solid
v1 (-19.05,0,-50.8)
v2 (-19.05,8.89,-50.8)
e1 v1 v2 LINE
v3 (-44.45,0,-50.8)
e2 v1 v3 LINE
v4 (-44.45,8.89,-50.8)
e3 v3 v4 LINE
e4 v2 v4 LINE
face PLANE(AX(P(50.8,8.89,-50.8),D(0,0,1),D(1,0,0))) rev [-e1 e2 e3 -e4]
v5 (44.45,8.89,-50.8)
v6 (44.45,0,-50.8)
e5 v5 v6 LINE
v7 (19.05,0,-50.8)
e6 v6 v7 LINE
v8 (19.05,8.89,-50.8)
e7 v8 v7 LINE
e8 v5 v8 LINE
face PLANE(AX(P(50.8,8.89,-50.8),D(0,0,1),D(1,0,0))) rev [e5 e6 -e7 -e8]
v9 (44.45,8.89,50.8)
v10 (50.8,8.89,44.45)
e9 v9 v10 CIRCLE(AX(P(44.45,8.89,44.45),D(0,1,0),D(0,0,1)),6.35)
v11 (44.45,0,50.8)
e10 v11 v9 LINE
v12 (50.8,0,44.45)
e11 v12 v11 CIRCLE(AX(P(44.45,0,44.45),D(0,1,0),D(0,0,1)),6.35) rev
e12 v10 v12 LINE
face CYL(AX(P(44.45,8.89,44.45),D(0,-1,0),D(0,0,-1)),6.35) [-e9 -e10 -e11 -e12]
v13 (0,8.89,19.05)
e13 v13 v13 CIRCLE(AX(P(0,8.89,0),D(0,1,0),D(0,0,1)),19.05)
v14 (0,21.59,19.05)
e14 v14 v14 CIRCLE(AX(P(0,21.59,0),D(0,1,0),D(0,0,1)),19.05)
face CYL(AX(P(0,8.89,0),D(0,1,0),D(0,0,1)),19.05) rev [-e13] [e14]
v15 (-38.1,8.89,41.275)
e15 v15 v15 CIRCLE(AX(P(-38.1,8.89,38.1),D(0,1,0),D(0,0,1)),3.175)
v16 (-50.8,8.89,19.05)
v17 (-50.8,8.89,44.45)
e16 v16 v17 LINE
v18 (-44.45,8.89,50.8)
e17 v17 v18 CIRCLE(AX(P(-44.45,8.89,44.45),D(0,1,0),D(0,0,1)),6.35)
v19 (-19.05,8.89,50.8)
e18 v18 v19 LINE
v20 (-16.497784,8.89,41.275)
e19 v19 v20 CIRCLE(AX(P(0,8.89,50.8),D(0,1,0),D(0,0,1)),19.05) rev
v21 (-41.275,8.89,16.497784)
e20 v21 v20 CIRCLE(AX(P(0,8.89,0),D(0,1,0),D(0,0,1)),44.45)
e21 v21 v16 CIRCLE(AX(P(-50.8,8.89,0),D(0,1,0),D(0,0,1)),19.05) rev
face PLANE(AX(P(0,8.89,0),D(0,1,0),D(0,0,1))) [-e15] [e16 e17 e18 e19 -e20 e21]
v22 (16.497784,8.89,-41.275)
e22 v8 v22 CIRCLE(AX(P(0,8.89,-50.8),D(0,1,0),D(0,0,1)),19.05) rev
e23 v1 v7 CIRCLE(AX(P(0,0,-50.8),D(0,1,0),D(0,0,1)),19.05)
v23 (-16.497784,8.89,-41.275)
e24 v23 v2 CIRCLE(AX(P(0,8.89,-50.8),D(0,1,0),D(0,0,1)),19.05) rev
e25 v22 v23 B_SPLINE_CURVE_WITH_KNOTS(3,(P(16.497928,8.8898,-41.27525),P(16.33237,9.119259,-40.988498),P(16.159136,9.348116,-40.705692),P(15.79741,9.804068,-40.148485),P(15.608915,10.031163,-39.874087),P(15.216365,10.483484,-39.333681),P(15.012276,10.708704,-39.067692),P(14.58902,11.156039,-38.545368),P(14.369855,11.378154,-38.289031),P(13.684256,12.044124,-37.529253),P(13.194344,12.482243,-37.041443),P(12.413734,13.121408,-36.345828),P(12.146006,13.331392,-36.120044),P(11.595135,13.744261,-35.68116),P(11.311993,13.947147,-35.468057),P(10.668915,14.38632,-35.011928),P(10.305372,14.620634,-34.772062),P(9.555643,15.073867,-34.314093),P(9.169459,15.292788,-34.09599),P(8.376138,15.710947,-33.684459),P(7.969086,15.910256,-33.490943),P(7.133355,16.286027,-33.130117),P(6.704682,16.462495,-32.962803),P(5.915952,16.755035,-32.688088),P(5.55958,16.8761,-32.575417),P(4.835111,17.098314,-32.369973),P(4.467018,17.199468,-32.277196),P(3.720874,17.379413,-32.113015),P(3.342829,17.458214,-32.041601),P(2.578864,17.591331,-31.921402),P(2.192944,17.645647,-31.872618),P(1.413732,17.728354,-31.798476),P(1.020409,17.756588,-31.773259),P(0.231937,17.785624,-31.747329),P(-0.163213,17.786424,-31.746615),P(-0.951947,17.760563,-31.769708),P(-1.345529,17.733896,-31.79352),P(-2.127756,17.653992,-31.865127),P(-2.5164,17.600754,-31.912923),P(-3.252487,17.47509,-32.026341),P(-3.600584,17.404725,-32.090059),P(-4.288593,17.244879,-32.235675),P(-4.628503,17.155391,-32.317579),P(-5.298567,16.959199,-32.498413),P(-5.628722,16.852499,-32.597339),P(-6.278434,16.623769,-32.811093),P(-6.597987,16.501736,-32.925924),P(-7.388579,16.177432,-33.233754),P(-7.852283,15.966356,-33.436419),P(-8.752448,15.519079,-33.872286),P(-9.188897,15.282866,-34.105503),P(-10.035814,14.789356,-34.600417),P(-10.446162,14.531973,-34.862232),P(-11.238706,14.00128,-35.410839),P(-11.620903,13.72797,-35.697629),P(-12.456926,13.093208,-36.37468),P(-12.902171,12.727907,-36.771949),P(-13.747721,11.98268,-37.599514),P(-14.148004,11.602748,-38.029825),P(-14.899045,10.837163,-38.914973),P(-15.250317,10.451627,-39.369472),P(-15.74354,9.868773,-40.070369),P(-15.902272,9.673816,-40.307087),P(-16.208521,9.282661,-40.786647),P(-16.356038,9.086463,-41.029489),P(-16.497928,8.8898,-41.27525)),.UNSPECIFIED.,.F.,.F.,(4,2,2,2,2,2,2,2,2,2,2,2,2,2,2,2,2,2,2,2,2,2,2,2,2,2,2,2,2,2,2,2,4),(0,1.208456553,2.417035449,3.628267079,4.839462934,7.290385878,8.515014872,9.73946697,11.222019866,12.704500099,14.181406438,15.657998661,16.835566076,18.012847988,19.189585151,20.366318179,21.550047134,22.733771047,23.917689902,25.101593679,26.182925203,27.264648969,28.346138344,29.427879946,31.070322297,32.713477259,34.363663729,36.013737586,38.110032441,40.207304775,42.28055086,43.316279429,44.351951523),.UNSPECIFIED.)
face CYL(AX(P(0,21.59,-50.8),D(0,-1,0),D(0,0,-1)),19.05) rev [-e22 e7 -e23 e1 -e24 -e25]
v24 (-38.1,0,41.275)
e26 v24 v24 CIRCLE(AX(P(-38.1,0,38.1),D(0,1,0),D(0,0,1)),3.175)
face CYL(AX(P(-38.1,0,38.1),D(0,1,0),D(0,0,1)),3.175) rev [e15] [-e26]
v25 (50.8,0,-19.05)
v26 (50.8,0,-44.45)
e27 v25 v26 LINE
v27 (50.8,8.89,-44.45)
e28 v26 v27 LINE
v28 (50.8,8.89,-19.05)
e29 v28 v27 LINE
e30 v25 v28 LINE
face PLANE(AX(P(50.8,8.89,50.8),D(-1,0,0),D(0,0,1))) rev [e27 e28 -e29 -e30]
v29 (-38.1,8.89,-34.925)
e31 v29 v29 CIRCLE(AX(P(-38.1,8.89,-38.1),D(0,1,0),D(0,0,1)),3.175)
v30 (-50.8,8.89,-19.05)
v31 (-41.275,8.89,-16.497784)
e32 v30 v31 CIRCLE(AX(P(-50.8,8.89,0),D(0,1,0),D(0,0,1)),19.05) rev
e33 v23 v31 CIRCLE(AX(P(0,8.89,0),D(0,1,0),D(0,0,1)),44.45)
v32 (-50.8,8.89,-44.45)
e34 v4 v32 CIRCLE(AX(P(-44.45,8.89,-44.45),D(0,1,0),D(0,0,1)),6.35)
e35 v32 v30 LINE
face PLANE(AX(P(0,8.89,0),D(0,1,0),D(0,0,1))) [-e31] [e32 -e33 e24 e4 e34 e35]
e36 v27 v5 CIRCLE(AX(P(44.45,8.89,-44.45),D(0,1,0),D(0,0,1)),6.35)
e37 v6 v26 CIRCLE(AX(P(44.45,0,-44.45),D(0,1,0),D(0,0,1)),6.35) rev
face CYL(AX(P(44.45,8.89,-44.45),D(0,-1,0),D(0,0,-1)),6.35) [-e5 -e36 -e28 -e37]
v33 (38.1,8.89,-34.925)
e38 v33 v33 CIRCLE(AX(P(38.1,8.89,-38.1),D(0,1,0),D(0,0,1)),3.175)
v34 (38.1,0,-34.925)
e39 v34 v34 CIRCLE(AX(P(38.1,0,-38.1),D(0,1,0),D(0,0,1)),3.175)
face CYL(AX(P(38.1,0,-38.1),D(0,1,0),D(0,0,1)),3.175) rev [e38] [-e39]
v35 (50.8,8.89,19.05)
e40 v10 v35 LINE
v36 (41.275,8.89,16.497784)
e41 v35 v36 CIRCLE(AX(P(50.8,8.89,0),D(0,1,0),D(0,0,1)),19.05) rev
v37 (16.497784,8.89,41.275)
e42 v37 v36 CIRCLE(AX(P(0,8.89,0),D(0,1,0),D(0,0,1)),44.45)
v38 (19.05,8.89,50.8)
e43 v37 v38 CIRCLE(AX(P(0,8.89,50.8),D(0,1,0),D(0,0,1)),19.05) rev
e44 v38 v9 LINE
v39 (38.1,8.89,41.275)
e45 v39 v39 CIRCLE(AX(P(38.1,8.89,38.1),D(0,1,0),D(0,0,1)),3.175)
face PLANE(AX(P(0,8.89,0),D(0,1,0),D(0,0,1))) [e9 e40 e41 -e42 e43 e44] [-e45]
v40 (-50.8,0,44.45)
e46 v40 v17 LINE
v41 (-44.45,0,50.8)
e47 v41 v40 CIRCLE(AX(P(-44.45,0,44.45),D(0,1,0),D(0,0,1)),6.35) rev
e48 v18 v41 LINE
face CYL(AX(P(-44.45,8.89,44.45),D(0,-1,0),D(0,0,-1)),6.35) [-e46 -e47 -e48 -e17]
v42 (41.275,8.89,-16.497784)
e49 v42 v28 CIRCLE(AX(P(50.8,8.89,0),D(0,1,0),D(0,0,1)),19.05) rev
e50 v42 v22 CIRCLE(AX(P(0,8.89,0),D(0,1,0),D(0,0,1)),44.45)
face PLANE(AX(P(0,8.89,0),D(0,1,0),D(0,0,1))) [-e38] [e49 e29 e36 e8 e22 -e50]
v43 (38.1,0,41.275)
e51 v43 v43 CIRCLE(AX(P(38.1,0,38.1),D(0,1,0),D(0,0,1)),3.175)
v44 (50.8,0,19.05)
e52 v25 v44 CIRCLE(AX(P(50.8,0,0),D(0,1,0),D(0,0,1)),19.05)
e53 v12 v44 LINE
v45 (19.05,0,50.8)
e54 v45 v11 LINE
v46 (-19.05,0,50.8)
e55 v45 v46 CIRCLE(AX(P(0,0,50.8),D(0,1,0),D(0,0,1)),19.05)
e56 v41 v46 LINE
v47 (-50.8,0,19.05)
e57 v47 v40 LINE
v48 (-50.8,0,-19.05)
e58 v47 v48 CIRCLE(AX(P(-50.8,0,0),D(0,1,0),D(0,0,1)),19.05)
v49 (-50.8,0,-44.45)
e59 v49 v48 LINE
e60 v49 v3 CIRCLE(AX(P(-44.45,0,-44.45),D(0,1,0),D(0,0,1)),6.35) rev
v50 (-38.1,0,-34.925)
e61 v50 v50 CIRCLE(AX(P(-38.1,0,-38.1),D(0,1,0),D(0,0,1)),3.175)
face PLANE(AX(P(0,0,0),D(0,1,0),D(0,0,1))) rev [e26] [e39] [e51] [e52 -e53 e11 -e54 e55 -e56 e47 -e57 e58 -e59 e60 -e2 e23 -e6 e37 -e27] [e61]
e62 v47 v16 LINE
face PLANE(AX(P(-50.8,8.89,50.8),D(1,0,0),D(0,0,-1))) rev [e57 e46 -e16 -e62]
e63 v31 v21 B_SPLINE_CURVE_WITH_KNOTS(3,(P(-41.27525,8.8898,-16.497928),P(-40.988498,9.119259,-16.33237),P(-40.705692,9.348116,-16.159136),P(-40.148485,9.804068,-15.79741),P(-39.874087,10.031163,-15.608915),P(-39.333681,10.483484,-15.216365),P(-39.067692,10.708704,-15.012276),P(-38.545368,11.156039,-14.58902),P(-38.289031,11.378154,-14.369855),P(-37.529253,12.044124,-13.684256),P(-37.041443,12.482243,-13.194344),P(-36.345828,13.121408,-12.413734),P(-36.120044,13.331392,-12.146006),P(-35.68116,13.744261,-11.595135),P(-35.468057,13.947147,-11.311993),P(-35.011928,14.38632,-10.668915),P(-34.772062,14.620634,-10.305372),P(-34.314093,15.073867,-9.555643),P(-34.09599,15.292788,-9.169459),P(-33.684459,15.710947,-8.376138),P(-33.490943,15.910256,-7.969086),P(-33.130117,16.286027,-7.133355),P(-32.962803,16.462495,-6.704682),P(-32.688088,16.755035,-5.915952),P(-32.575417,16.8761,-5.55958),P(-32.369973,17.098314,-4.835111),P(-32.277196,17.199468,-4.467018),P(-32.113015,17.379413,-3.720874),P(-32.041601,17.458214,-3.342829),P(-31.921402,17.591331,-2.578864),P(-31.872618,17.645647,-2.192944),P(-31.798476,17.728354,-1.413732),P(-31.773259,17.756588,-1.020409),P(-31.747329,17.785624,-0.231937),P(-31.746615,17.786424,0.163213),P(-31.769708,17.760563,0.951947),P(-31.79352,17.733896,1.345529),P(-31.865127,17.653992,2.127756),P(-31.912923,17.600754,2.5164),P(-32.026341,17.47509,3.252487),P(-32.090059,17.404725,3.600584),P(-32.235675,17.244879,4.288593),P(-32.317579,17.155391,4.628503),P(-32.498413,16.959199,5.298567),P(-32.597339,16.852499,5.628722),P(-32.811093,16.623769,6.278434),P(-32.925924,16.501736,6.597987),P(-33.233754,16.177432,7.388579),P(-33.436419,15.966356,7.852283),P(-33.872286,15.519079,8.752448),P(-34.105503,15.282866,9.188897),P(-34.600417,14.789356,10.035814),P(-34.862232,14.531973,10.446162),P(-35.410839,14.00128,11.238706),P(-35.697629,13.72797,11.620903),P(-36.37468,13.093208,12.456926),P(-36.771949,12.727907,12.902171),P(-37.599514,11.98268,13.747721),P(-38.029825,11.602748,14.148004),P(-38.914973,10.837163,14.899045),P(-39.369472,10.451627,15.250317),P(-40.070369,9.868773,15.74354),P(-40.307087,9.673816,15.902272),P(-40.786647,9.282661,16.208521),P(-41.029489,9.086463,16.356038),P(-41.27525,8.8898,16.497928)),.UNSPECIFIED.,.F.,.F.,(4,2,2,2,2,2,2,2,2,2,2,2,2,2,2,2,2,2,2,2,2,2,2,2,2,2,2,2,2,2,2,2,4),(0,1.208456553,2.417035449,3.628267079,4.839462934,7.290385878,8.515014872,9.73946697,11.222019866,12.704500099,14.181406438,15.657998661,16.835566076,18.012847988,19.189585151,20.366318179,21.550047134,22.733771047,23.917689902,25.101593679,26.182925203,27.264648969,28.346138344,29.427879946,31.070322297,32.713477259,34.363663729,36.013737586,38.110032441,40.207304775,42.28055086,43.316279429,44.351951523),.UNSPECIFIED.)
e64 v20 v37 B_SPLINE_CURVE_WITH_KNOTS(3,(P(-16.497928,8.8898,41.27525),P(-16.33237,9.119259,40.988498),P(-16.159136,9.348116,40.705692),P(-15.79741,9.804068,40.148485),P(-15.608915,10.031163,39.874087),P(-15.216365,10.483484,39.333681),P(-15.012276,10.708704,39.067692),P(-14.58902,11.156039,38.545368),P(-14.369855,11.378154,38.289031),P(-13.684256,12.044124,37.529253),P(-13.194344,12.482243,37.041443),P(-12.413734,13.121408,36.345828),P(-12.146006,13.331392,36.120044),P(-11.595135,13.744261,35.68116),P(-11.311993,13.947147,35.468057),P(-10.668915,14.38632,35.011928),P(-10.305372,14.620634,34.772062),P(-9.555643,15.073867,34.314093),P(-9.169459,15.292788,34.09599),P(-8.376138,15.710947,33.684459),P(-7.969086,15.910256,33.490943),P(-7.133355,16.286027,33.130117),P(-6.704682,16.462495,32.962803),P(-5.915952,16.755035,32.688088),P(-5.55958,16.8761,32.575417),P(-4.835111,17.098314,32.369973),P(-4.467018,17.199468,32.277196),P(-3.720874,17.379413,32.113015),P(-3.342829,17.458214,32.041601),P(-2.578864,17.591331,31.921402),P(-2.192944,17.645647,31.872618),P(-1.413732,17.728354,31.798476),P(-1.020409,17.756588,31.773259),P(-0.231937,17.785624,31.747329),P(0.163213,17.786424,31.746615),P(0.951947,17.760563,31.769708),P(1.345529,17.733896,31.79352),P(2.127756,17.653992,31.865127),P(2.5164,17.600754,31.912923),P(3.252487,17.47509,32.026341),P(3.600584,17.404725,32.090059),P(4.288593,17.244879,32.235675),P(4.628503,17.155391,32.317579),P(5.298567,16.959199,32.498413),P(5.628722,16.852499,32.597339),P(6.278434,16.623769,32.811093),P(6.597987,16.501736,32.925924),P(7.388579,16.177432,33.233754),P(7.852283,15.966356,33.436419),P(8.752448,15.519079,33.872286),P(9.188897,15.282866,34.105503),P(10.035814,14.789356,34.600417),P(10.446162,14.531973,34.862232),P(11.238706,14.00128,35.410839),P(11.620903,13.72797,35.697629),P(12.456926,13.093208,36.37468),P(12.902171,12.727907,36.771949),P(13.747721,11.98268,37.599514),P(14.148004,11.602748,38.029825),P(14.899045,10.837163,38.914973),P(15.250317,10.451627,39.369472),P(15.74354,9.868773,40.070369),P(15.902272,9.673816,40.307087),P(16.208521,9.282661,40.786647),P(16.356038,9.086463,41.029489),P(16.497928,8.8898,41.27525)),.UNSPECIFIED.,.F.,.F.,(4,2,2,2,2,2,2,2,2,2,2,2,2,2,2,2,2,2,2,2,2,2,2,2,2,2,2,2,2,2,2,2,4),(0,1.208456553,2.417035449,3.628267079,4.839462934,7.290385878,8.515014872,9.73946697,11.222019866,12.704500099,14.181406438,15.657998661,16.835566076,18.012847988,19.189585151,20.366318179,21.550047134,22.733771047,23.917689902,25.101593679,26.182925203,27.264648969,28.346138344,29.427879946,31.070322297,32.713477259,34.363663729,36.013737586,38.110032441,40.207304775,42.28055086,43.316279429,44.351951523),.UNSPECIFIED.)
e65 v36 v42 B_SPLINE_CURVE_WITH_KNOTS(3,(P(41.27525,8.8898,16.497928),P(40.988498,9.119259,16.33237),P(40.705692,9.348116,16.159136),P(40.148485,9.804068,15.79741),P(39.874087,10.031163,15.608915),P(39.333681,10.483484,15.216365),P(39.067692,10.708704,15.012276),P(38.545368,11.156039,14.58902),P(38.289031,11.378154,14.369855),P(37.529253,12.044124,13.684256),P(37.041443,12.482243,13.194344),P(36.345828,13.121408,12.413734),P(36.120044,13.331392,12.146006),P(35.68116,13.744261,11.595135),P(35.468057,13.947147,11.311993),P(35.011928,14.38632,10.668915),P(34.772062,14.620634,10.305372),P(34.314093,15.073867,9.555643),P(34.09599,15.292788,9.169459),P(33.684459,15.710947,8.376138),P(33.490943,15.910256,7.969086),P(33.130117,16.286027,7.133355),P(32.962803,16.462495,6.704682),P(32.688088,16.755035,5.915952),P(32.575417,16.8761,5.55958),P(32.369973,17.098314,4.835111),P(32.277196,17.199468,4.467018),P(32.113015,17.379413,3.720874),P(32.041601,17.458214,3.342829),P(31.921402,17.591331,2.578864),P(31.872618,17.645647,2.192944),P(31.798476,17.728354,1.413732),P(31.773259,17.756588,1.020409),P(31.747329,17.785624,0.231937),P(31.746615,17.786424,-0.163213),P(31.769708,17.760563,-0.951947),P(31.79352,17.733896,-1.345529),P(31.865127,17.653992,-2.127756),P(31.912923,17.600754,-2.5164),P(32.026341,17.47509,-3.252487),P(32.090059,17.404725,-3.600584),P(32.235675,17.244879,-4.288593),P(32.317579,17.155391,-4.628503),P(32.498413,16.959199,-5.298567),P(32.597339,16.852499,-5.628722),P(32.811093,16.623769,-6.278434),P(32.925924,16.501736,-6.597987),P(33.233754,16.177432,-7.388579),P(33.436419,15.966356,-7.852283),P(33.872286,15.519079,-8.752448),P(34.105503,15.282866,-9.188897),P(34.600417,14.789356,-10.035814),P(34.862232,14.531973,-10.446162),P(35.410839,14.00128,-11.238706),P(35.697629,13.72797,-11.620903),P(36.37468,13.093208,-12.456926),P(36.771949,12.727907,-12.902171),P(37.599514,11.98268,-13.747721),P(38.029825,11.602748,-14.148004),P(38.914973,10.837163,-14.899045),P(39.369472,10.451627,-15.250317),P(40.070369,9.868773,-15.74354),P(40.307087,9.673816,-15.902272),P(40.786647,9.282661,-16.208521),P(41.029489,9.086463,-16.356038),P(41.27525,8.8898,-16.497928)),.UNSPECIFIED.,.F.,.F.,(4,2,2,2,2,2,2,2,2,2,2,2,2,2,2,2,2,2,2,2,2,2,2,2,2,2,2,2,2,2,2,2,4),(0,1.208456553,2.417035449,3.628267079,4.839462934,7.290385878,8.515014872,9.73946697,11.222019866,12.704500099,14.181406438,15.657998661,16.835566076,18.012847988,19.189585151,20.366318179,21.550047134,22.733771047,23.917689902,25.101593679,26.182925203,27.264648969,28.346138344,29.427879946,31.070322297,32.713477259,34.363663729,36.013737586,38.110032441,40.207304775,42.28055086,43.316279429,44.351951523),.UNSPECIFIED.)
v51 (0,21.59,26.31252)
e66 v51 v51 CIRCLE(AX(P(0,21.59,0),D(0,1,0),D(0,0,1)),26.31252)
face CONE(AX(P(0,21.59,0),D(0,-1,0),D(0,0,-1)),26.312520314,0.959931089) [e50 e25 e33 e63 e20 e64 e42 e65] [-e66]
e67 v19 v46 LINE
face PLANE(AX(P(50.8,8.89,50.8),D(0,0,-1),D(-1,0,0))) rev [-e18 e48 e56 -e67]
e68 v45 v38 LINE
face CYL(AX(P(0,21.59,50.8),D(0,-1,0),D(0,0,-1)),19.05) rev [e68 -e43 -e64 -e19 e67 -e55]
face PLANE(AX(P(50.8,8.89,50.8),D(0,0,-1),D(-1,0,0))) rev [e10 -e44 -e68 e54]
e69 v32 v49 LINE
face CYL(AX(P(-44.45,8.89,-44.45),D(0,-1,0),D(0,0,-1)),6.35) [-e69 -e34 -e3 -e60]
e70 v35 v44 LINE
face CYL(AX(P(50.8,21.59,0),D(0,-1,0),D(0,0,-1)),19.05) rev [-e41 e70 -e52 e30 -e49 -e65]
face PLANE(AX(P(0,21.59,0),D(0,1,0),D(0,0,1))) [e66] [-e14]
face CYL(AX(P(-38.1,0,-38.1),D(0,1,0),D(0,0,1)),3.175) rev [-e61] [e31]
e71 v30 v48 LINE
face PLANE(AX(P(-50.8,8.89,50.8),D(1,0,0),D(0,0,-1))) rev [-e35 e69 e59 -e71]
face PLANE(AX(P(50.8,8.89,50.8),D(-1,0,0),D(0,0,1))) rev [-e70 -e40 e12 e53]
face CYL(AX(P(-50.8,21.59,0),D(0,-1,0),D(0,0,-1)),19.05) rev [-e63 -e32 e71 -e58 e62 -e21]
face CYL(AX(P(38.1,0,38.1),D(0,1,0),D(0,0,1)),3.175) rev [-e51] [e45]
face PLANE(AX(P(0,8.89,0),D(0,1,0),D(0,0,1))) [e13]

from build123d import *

# Parameters (mm, degrees)
SKETCH1_W           = 101.6
SKETCH1_H           = 101.6
BOSS_EXTRUDE1_DEPTH = 8.89
SKETCH2_R           = 44.45
BOSS_EXTRUDE2_DEPTH = 12.7
FILLET1_R           = 6.35
SKETCH5_R           = 3.175
CUT_EXTRUDE1_DEPTH  = 73.955945611
CHAMFER1_SIZE2      = 18.137479686
CHAMFER1_SIZE       = 12.7
SKETCH6_R           = 19.05
CUT_EXTRUDE2_DEPTH  = 12.7
SKETCH7_R           = 19.05
CUT_EXTRUDE3_DEPTH  = 76.016052282


with BuildPart() as part:
    # Sketch1 → Boss-Extrude1 (new body)
    with BuildSketch(Plane(origin=(0, 0, 0), x_dir=(1, 0, 0), z_dir=(0, 1, 0))):
        Rectangle(SKETCH1_W, SKETCH1_H)
    extrude(amount=BOSS_EXTRUDE1_DEPTH)

    # Sketch2 → Boss-Extrude2 (add)
    with BuildSketch(Plane(origin=(0, 8.89, 0), x_dir=(1, 0, 0), z_dir=(0, 1, 0))):
        with Locations(Location((0, 0, 0), (0, 0, 270))):
            Circle(SKETCH2_R)
    extrude(amount=BOSS_EXTRUDE2_DEPTH)

    # Fillet1
    fillet1_edges = [part.edges().sort_by_distance(p)[0] for p in [
        (-50.8, 4.445, -50.8),
        (50.8, 4.445, -50.8),
        (50.8, 4.445, 50.8),
        (-50.8, 4.445, 50.8),
    ]]
    fillet(fillet1_edges, radius=FILLET1_R)

    # Sketch5 → Cut-Extrude1 (cut, through all)
    with BuildSketch(Plane(origin=(0, 8.89, 0), x_dir=(1, 0, 0), z_dir=(0, 1, 0))):
        with Locations(Location((-38.1, 38.1, 0), (0, 0, 270))):
            Circle(SKETCH5_R)
        with Locations(Location((38.1, 38.1, 0), (0, 0, 270))):
            Circle(SKETCH5_R)
        with Locations(Location((-38.1, -38.1, 0), (0, 0, 270))):
            Circle(SKETCH5_R)
        with Locations(Location((38.1, -38.1, 0), (0, 0, 270))):
            Circle(SKETCH5_R)
    extrude(amount=-CUT_EXTRUDE1_DEPTH, mode=Mode.SUBTRACT)

    # Chamfer1
    chamfer1_edges = [part.edges().sort_by_distance(p)[0] for p in [
        (0, 21.59, -44.45),
    ]]
    chamfer1_side = [part.faces().sort_by_distance(p)[0] for p in [
        (0, 21.336, -44.45),
    ]]
    chamfer(chamfer1_edges, length=CHAMFER1_SIZE - 0.0001, length2=CHAMFER1_SIZE2 - 0.0001, reference=chamfer1_side[0])  # a hair under: the kernel refuses the full size

    # Sketch6 → Cut-Extrude2 (cut)
    with BuildSketch(Plane(origin=(0, 21.59, 0), x_dir=(1, 0, 0), z_dir=(0, 1, 0))):
        with Locations(Location((0, 0, 0), (0, 0, 270))):
            Circle(SKETCH6_R)
    extrude(amount=-CUT_EXTRUDE2_DEPTH, mode=Mode.SUBTRACT)

    # Sketch7 → Cut-Extrude3 (cut, through all)
    with BuildSketch(Plane(origin=(0, 0, 0), x_dir=(1, 0, 0), z_dir=(0, 1, 0))):
        with Locations((-50.8, 0)):
            Circle(SKETCH7_R)
        with Locations((0, 50.8)):
            Circle(SKETCH7_R)
        with Locations((50.8, 0)):
            Circle(SKETCH7_R)
        with Locations((0, -50.8)):
            Circle(SKETCH7_R)
    extrude(amount=CUT_EXTRUDE3_DEPTH, mode=Mode.SUBTRACT)


solid = part.part
